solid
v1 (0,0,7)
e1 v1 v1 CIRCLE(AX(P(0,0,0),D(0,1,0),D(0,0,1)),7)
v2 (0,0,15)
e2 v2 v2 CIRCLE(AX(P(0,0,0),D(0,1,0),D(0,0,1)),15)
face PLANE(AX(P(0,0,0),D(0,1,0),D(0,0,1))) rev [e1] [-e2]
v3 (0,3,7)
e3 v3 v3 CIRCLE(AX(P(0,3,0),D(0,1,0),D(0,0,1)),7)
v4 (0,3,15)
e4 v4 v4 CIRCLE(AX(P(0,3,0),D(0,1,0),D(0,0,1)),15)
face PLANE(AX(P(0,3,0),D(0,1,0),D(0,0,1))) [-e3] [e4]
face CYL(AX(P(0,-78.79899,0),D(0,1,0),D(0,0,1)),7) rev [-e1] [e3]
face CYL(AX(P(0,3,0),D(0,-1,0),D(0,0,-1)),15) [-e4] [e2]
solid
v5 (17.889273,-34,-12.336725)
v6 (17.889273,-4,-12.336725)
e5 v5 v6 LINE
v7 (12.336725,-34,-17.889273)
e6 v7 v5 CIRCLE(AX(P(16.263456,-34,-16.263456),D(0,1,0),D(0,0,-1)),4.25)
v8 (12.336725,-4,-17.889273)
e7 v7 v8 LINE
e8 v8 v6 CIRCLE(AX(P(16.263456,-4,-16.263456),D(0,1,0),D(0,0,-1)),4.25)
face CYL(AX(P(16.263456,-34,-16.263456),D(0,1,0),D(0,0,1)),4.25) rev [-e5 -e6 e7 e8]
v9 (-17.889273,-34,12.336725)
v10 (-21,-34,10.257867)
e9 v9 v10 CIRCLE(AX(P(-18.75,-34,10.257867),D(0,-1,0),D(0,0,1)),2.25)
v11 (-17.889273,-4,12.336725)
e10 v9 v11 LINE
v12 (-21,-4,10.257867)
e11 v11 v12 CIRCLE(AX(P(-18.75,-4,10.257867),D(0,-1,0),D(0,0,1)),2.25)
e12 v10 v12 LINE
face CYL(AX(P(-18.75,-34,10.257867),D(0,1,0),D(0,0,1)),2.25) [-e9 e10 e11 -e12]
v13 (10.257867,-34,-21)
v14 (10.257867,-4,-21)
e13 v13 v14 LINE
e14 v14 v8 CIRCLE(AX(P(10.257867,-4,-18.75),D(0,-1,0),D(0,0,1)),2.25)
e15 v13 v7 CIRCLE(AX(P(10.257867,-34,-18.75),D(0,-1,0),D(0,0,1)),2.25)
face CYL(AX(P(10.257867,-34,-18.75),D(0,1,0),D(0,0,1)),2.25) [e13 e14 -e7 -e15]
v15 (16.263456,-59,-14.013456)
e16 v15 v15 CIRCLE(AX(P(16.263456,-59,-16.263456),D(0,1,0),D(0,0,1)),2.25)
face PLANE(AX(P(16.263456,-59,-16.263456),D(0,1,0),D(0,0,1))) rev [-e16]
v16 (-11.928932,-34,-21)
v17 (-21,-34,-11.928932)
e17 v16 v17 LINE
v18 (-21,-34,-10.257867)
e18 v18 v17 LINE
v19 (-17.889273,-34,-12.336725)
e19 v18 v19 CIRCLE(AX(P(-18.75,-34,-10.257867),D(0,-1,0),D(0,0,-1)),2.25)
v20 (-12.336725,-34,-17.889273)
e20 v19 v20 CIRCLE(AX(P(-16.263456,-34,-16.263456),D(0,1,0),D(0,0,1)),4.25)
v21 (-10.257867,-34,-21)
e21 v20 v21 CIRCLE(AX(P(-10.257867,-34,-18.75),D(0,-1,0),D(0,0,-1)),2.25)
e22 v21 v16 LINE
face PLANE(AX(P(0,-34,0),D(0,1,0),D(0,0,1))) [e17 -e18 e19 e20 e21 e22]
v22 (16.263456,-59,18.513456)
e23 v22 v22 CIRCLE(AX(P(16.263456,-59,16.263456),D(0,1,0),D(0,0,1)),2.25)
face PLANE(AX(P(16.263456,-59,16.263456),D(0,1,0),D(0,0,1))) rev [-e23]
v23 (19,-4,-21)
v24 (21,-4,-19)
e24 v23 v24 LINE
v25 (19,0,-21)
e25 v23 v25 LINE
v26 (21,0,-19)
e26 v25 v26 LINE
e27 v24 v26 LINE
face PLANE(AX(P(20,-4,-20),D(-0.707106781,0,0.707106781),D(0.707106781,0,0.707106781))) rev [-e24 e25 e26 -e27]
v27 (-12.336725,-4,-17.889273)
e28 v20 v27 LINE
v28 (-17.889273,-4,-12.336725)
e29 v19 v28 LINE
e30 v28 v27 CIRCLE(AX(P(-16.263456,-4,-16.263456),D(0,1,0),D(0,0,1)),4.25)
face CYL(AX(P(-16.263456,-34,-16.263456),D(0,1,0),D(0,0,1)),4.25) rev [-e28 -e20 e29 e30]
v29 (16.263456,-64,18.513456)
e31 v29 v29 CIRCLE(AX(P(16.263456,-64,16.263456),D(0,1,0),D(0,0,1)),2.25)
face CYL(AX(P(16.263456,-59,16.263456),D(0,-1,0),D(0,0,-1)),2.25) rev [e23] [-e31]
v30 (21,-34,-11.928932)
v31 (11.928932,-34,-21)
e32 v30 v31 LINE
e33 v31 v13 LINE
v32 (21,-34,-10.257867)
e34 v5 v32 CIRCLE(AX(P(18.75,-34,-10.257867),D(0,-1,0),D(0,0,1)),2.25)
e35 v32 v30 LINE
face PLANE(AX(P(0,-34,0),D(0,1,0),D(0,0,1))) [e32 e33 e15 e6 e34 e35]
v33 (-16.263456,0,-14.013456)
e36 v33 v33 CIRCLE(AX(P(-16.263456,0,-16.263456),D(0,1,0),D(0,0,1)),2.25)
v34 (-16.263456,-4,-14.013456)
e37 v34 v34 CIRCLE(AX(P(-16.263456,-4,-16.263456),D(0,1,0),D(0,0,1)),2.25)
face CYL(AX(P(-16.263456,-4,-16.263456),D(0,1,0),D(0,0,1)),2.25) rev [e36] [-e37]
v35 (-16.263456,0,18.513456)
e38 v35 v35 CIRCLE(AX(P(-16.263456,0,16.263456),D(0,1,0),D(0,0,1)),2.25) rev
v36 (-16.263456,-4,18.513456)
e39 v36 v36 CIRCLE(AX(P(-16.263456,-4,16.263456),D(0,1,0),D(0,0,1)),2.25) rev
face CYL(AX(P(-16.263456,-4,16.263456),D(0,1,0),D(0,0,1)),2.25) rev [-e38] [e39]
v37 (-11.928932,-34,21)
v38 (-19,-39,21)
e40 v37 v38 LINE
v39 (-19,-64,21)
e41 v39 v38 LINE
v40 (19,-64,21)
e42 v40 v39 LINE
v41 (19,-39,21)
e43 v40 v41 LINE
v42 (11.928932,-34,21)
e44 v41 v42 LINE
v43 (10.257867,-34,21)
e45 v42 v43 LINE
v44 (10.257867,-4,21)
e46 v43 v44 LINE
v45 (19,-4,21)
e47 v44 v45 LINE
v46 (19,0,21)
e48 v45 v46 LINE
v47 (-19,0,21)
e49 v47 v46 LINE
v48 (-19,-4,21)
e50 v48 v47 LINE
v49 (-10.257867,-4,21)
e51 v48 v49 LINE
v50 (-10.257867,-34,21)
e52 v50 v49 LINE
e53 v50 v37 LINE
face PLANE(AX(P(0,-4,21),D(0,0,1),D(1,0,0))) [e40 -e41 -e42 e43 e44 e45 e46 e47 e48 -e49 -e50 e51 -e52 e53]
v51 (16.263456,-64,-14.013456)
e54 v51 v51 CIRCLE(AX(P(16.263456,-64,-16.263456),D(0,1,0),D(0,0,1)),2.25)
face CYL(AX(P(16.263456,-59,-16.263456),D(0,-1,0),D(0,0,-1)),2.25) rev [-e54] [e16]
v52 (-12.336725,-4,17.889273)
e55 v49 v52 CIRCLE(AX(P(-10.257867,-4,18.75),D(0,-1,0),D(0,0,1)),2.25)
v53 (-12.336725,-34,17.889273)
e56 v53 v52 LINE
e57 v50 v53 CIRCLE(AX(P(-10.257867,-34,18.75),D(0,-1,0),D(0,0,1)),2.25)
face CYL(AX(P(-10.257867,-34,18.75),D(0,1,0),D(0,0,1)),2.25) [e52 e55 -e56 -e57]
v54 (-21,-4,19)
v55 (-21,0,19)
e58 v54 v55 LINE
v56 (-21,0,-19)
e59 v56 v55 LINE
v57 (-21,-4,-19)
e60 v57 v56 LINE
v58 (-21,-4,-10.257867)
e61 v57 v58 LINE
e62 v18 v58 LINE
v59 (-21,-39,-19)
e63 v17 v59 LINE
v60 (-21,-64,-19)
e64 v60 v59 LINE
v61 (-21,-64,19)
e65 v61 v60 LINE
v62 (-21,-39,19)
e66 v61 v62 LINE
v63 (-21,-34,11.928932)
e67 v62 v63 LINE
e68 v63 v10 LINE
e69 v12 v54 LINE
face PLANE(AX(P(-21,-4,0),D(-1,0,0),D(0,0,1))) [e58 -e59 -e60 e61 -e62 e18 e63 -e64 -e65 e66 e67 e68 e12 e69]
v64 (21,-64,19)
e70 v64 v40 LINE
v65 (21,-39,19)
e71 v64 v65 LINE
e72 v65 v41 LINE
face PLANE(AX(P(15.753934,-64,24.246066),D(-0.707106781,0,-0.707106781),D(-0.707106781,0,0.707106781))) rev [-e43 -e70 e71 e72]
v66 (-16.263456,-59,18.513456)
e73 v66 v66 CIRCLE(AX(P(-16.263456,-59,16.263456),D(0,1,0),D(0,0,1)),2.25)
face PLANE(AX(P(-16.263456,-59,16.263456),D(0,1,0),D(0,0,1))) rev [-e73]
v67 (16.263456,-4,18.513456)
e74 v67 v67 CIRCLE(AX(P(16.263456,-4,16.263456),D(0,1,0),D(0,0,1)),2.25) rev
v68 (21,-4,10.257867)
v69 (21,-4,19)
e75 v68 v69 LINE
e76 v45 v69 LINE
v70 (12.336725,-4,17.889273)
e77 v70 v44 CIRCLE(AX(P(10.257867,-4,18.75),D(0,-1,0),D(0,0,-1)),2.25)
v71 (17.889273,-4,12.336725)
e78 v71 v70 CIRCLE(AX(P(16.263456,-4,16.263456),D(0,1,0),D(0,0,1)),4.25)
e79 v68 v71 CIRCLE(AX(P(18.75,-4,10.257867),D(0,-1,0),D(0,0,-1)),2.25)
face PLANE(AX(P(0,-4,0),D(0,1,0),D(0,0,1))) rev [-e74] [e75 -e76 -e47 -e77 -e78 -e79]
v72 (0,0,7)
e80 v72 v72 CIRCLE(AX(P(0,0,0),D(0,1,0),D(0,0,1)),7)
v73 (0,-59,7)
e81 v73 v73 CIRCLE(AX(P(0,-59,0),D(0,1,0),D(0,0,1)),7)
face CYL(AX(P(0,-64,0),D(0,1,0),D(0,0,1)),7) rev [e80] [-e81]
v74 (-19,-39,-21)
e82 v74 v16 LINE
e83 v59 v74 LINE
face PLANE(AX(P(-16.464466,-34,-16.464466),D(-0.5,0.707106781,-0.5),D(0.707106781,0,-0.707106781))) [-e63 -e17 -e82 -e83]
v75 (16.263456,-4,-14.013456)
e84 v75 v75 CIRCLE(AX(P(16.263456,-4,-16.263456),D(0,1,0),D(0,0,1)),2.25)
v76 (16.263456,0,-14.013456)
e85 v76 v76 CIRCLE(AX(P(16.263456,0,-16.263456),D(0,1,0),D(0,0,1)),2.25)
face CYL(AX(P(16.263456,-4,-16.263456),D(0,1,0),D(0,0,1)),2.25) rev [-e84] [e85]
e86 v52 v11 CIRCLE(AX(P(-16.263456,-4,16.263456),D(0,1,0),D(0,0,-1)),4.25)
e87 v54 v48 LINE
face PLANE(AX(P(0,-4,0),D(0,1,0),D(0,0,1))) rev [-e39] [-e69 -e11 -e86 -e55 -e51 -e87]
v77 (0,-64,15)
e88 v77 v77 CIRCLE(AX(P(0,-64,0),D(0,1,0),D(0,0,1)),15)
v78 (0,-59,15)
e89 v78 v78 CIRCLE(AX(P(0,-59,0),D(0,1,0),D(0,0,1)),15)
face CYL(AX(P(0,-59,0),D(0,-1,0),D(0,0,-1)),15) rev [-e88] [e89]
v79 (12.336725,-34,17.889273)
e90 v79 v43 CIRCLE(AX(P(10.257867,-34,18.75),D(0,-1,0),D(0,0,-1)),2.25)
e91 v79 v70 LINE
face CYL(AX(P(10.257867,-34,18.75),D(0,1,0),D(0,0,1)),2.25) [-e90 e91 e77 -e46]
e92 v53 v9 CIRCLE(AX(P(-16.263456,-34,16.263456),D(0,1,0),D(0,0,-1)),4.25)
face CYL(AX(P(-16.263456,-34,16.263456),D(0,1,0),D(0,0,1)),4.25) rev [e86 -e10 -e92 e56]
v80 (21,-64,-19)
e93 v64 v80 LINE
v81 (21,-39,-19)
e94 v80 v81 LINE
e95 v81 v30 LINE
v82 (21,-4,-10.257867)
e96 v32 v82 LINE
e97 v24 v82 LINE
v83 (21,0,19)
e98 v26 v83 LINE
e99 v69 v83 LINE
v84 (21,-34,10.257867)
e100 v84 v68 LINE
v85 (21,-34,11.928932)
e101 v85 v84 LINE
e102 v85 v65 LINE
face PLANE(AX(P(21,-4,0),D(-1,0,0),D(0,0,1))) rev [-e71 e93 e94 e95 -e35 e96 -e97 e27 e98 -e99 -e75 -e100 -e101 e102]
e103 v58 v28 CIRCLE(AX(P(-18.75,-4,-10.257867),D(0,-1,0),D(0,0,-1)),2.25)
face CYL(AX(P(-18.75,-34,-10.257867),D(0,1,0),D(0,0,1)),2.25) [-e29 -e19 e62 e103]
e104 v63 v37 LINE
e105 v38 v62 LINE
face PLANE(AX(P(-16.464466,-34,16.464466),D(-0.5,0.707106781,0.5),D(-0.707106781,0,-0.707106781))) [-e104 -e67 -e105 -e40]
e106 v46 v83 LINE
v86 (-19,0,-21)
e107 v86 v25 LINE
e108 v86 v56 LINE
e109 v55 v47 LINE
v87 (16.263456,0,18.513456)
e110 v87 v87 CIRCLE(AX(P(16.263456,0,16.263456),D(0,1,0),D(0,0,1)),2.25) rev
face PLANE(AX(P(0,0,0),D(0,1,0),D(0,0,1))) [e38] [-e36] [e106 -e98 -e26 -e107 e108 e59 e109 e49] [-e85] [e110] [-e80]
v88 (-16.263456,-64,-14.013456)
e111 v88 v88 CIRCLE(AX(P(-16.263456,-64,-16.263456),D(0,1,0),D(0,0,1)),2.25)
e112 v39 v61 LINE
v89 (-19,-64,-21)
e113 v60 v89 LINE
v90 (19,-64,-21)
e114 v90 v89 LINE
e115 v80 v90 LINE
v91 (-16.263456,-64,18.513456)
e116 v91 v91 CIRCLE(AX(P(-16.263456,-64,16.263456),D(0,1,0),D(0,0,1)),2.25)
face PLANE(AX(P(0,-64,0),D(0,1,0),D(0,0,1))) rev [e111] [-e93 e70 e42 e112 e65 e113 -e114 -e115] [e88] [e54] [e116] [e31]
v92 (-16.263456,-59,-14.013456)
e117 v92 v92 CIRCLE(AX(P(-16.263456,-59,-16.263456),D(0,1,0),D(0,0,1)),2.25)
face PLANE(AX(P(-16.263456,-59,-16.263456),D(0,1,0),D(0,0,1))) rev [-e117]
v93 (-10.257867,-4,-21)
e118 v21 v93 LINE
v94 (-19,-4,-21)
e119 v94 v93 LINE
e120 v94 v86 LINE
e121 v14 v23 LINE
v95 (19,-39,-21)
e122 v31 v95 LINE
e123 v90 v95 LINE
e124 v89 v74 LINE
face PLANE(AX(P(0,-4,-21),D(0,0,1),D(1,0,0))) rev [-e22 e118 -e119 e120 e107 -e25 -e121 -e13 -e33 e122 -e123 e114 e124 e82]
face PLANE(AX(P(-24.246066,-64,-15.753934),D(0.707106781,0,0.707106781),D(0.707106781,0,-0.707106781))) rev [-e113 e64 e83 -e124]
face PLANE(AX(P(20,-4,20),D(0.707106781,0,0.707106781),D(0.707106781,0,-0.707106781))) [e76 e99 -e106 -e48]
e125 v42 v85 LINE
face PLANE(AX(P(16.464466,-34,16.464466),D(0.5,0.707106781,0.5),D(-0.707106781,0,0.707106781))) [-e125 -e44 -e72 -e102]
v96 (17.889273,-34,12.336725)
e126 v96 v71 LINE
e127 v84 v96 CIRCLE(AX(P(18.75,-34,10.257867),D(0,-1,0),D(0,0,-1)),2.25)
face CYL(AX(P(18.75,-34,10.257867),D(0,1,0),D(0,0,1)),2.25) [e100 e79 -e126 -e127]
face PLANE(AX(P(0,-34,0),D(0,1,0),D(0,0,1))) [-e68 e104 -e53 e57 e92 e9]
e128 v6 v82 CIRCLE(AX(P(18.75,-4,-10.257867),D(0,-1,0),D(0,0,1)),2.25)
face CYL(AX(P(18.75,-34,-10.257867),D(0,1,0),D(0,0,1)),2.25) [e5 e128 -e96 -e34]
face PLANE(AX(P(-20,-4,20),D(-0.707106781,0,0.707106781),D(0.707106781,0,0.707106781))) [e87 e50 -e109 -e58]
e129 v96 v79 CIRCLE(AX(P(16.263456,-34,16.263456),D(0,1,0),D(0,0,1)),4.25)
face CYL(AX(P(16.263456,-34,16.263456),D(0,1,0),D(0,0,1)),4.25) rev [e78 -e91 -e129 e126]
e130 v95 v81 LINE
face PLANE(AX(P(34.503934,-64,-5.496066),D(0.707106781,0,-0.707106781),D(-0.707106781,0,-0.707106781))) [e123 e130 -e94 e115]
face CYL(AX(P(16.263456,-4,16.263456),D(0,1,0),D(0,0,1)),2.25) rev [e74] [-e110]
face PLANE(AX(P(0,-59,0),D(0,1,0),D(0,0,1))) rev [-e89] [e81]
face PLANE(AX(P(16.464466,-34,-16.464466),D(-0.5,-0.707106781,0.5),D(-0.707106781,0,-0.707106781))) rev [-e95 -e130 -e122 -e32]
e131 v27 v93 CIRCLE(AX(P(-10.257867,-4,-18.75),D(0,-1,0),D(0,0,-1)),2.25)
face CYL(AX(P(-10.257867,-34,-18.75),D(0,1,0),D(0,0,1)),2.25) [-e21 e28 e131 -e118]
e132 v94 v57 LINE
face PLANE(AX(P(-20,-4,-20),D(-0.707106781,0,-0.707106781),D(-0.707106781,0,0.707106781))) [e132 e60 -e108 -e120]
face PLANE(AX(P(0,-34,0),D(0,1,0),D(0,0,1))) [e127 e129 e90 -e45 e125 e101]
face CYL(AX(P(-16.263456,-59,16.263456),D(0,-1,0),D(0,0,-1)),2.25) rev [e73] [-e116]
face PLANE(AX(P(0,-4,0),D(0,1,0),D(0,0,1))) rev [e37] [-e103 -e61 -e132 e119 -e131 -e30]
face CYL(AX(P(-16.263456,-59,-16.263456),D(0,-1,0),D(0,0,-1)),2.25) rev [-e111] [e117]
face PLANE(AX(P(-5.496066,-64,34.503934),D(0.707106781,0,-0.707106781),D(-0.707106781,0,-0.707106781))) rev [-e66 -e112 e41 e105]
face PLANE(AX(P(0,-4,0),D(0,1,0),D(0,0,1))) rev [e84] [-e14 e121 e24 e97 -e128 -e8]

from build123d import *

# Parameters (mm, degrees)
SKETCH1_R           = 7
BOSS_EXTRUDE1_DEPTH = 26
SKETCH1_3_R         = 15
SKETCH1_3_R_2       = 7
BOSS_EXTRUDE2_DEPTH = 3
SKETCH1_4_R         = 15
SKETCH1_4_R_2       = 2.25
SKETCH1_4_R_3       = 7
BOSS_EXTRUDE3_DEPTH = 4
BOSS_EXTRUDE4_DEPTH = 30
BOSS_EXTRUDE6_START = -64
SKETCH1_6_R         = 15
SKETCH1_6_R_2       = 2.25
SKETCH1_6_R_3       = 7
BOSS_EXTRUDE6_DEPTH = 30
CUT_EXTRUDE3_START  = -64
SKETCH1_7_R         = 2.25
CUT_EXTRUDE3_DEPTH  = 5
CUT_EXTRUDE4_START  = -64
SKETCH1_8_R         = 15
SKETCH1_8_R_2       = 7
CUT_EXTRUDE4_DEPTH  = 5
CHAMFER1_START      = 4.04163056
CHAMFER1_DEPTH      = 3.535533906
CHAMFER2_START      = -7.577164466
CHAMFER2_DEPTH      = 3.535533906
CHAMFER3_START      = 4.04163056
CHAMFER3_DEPTH      = 3.535533906
CHAMFER4_START      = -7.577164466
CHAMFER4_DEPTH      = 3.535533906
CUT_EXTRUDE5_START  = -85
SKETCH4_R           = 7
CUT_EXTRUDE5_DEPTH  = 85


with BuildPart() as part:
    # Sketch1 → Boss-Extrude1 (new body)
    with BuildSketch(Plane(origin=(0, 0, 0), x_dir=(1, 0, 0), z_dir=(0, 1, 0))):
        with Locations(Location((0, 0, 0), (0, 0, 90))):
            Circle(SKETCH1_R)
    extrude(amount=BOSS_EXTRUDE1_DEPTH)

    # Sketch1<3> → Boss-Extrude2 (add)
    with BuildSketch(Plane(origin=(0, 0, 0), x_dir=(1, 0, 0), z_dir=(0, 1, 0))):
        with Locations(Location((0, 0, 0), (0, 0, 270))):
            Circle(SKETCH1_3_R)
        with Locations(Location((0, 0, 0), (0, 0, 90))):
            Circle(SKETCH1_3_R_2, mode=Mode.SUBTRACT)
    extrude(amount=BOSS_EXTRUDE2_DEPTH)


with BuildPart() as body_2:
    # Sketch1<4> → Boss-Extrude3 (new body)
    # profile 1 of 3: a face of its own
    with BuildSketch(Plane(origin=(0, 0, 0), x_dir=(1, 0, 0), z_dir=(0, 1, 0))):
        Polygon((-19, -21), (19, -21), (21, -19), (21, 19), (19, 21), (-19, 21), (-21, 19), (-21, -19), align=None)
        with Locations(Location((0, 0, 0), (0, 0, 270))):
            Circle(SKETCH1_4_R, mode=Mode.SUBTRACT)
        with Locations(Location((16.263455967, -16.263455967, 0), (0, 0, 270))):
            Circle(SKETCH1_4_R_2, mode=Mode.SUBTRACT)
        with Locations(Location((16.263455967, 16.263455967, 0), (0, 0, 270))):
            Circle(SKETCH1_4_R_2, mode=Mode.SUBTRACT)
        with Locations(Location((-16.263455967, 16.263455967, 0), (0, 0, 270))):
            Circle(SKETCH1_4_R_2, mode=Mode.SUBTRACT)
        with Locations(Location((-16.263455967, -16.263455967, 0), (0, 0, 270))):
            Circle(SKETCH1_4_R_2, mode=Mode.SUBTRACT)
    # profile 2 of 3: a face of its own
    with BuildSketch(Plane(origin=(0, 0, 0), x_dir=(1, 0, 0), z_dir=(0, 1, 0))):
        with Locations(Location((0, 0, 0), (0, 0, 270))):
            Circle(SKETCH1_4_R)
        with Locations(Location((0, 0, 0), (0, 0, 90))):
            Circle(SKETCH1_4_R_3, mode=Mode.SUBTRACT)
    # profile 3 of 3: a face of its own
    with BuildSketch(Plane(origin=(0, 0, 0), x_dir=(1, 0, 0), z_dir=(0, 1, 0))):
        with Locations(Location((0, 0, 0), (0, 0, 90))):
            Circle(SKETCH1_4_R_3)
    extrude(amount=-BOSS_EXTRUDE3_DEPTH)

    # Sketch3 → Boss-Extrude4 (add)
    with BuildSketch(Plane.XZ.offset(4)):
        with BuildLine():
            Line((-10.257867006, 21), (10.257867006, 21))
            ThreePointArc((10.257867006, 21), (12.128580139, 20.000172937), (12.336724723, 17.889273219))
            ThreePointArc((12.336724723, 17.889273219), (13.258252147, 13.258252147), (17.889273219, 12.336724723))
            ThreePointArc((17.889273219, 12.336724723), (20.000172937, 12.128580139), (21, 10.257867006))
            Line((21, 10.257867006), (21, -10.257867006))
            ThreePointArc((21, -10.257867006), (20.000172937, -12.128580139), (17.889273219, -12.336724723))
            ThreePointArc((17.889273219, -12.336724723), (13.258252147, -13.258252147), (12.336724723, -17.889273219))
            ThreePointArc((12.336724723, -17.889273219), (12.128580139, -20.000172937), (10.257867006, -21))
            Line((10.257867006, -21), (-10.257867006, -21))
            ThreePointArc((-10.257867006, -21), (-12.128580139, -20.000172937), (-12.336724723, -17.889273219))
            ThreePointArc((-12.336724723, -17.889273219), (-13.258252147, -13.258252147), (-17.889273219, -12.336724723))
            ThreePointArc((-17.889273219, -12.336724723), (-20.000172937, -12.128580139), (-21, -10.257867006))
            Line((-21, -10.257867006), (-21, 10.257867006))
            ThreePointArc((-21, 10.257867006), (-20.000172937, 12.128580139), (-17.889273219, 12.336724723))
            ThreePointArc((-17.889273219, 12.336724723), (-13.258252147, 13.258252147), (-12.336724723, 17.889273219))
            ThreePointArc((-12.336724723, 17.889273219), (-12.128580139, 20.000172937), (-10.257867006, 21))
        make_face()
    extrude(amount=BOSS_EXTRUDE4_DEPTH)

    # Sketch1<6> → Boss-Extrude6 (add)
    # profile 1 of 6: a face of its own
    with BuildSketch(Plane(origin=(0, 0, 0), x_dir=(1, 0, 0), z_dir=(0, 1, 0)).offset(BOSS_EXTRUDE6_START)):
        Polygon((-19, -21), (19, -21), (21, -19), (21, 19), (19, 21), (-19, 21), (-21, 19), (-21, -19), align=None)
        with Locations(Location((0, 0, 0), (0, 0, 270))):
            Circle(SKETCH1_6_R, mode=Mode.SUBTRACT)
        with Locations(Location((16.263455967, -16.263455967, 0), (0, 0, 270))):
            Circle(SKETCH1_6_R_2, mode=Mode.SUBTRACT)
        with Locations(Location((16.263455967, 16.263455967, 0), (0, 0, 270))):
            Circle(SKETCH1_6_R_2, mode=Mode.SUBTRACT)
        with Locations(Location((-16.263455967, 16.263455967, 0), (0, 0, 270))):
            Circle(SKETCH1_6_R_2, mode=Mode.SUBTRACT)
        with Locations(Location((-16.263455967, -16.263455967, 0), (0, 0, 270))):
            Circle(SKETCH1_6_R_2, mode=Mode.SUBTRACT)
    # profile 2 of 6: a face of its own
    with BuildSketch(Plane(origin=(0, 0, 0), x_dir=(1, 0, 0), z_dir=(0, 1, 0)).offset(BOSS_EXTRUDE6_START)):
        with Locations(Location((-16.263455967, 16.263455967, 0), (0, 0, 270))):
            Circle(SKETCH1_6_R_2)
    # profile 3 of 6: a face of its own
    with BuildSketch(Plane(origin=(0, 0, 0), x_dir=(1, 0, 0), z_dir=(0, 1, 0)).offset(BOSS_EXTRUDE6_START)):
        with Locations(Location((16.263455967, 16.263455967, 0), (0, 0, 270))):
            Circle(SKETCH1_6_R_2)
    # profile 4 of 6: a face of its own
    with BuildSketch(Plane(origin=(0, 0, 0), x_dir=(1, 0, 0), z_dir=(0, 1, 0)).offset(BOSS_EXTRUDE6_START)):
        with Locations(Location((16.263455967, -16.263455967, 0), (0, 0, 270))):
            Circle(SKETCH1_6_R_2)
    # profile 5 of 6: a face of its own
    with BuildSketch(Plane(origin=(0, 0, 0), x_dir=(1, 0, 0), z_dir=(0, 1, 0)).offset(BOSS_EXTRUDE6_START)):
        with Locations(Location((-16.263455967, -16.263455967, 0), (0, 0, 270))):
            Circle(SKETCH1_6_R_2)
    # profile 6 of 6: a face of its own
    with BuildSketch(Plane(origin=(0, 0, 0), x_dir=(1, 0, 0), z_dir=(0, 1, 0)).offset(BOSS_EXTRUDE6_START)):
        with Locations(Location((0, 0, 0), (0, 0, 270))):
            Circle(SKETCH1_6_R)
        with Locations(Location((0, 0, 0), (0, 0, 90))):
            Circle(SKETCH1_6_R_3, mode=Mode.SUBTRACT)
    extrude(amount=BOSS_EXTRUDE6_DEPTH)

    # Sketch1<7> → Cut-Extrude3 (cut)
    with BuildSketch(Plane(origin=(0, 0, 0), x_dir=(1, 0, 0), z_dir=(0, 1, 0)).offset(CUT_EXTRUDE3_START)):
        with Locations(Location((-16.263455967, -16.263455967, 0), (0, 0, 270))):
            Circle(SKETCH1_7_R)
        with Locations(Location((-16.263455967, 16.263455967, 0), (0, 0, 270))):
            Circle(SKETCH1_7_R)
        with Locations(Location((16.263455967, 16.263455967, 0), (0, 0, 270))):
            Circle(SKETCH1_7_R)
        with Locations(Location((16.263455967, -16.263455967, 0), (0, 0, 270))):
            Circle(SKETCH1_7_R)
    extrude(amount=CUT_EXTRUDE3_DEPTH, mode=Mode.SUBTRACT)

    # Sketch1<8> → Cut-Extrude4 (cut)
    with BuildSketch(Plane(origin=(0, 0, 0), x_dir=(1, 0, 0), z_dir=(0, 1, 0)).offset(CUT_EXTRUDE4_START)):
        with Locations(Location((0, 0, 0), (0, 0, 270))):
            Circle(SKETCH1_8_R)
        with Locations(Location((0, 0, 0), (0, 0, 270))):
            Circle(SKETCH1_8_R_2, mode=Mode.SUBTRACT)
    extrude(amount=CUT_EXTRUDE4_DEPTH, mode=Mode.SUBTRACT)

    # Chamfer1: read off the stored shape, not the designer's step
    # Chamfer1 outline → Chamfer1 (cut)
    with BuildSketch(Plane(origin=(0, 0, 0), x_dir=(0.8660254037844387, 0.408248290463863, -0.28867513459481264), z_dir=(0.49999999999999983, -0.7071067811865479, 0.49999999999999983)).offset(CHAMFER1_START)):
        Polygon((-18.149022364, -36.776337352), (-28.62338925, -29.369841498), (-28.62338925, -38.030095536), (-26.313988174, -39.663088698), align=None)
    extrude(amount=CHAMFER1_DEPTH, mode=Mode.SUBTRACT)

    # Chamfer2: read off the stored shape, not the designer's step
    # Chamfer2 outline → Chamfer2 (cut)
    with BuildSketch(Plane(origin=(0, 0, 0), x_dir=(0.8660254037844386, -0.40824829046386313, 0.2886751345948132), z_dir=(0.5000000000000002, 0.7071067811865472, -0.5000000000000002)).offset(CHAMFER2_START)):
        Polygon((26.313988174, 39.663088698), (18.149022364, 36.776337352), (28.62338925, 29.369841498), (28.62338925, 38.030095536), align=None)
    extrude(amount=CHAMFER2_DEPTH, mode=Mode.SUBTRACT)

    # Chamfer3: read off the stored shape, not the designer's step
    # Chamfer3 outline → Chamfer3 (cut)
    with BuildSketch(Plane(origin=(0, 0, 0), x_dir=(0.8660254037844386, 0.40824829046386313, 0.2886751345948132), z_dir=(0.5000000000000002, -0.7071067811865472, -0.5000000000000002)).offset(CHAMFER3_START)):
        Polygon((-28.62338925, 29.369841498), (-18.149022364, 36.776337352), (-26.313988174, 39.663088698), (-28.62338925, 38.030095536), align=None)
    extrude(amount=CHAMFER3_DEPTH, mode=Mode.SUBTRACT)

    # Chamfer4: read off the stored shape, not the designer's step
    # Chamfer4 outline → Chamfer4 (cut)
    with BuildSketch(Plane(origin=(0, 0, 0), x_dir=(0.8660254037844387, -0.408248290463863, -0.28867513459481264), z_dir=(0.49999999999999983, 0.7071067811865479, 0.49999999999999983)).offset(CHAMFER4_START)):
        Polygon((28.62338925, -38.030095536), (28.62338925, -29.369841498), (18.149022364, -36.776337352), (26.313988174, -39.663088698), align=None)
    extrude(amount=CHAMFER4_DEPTH, mode=Mode.SUBTRACT)


with BuildPart() as cut_extrude5_tool:
    # Sketch4 → Cut-Extrude5 (new body)
    with BuildSketch(Plane(origin=(0, 26, 0), x_dir=(1, 0, 0), z_dir=(0, 1, 0)).offset(CUT_EXTRUDE5_START)):
        with Locations(Location((0, 0, 0), (0, 0, 270))):
            Circle(SKETCH4_R)
    extrude(amount=CUT_EXTRUDE5_DEPTH)


with BuildPart() as part_1:
    add(part.part)

    # Cut-Extrude5: cut by cut_extrude5_tool
    add(cut_extrude5_tool.part, mode=Mode.SUBTRACT)


with BuildPart() as body_2_1:
    add(body_2.part)

    # Cut-Extrude5: cut by cut_extrude5_tool
    add(cut_extrude5_tool.part, mode=Mode.SUBTRACT)


solid = Compound([part_1.part, body_2_1.part])
